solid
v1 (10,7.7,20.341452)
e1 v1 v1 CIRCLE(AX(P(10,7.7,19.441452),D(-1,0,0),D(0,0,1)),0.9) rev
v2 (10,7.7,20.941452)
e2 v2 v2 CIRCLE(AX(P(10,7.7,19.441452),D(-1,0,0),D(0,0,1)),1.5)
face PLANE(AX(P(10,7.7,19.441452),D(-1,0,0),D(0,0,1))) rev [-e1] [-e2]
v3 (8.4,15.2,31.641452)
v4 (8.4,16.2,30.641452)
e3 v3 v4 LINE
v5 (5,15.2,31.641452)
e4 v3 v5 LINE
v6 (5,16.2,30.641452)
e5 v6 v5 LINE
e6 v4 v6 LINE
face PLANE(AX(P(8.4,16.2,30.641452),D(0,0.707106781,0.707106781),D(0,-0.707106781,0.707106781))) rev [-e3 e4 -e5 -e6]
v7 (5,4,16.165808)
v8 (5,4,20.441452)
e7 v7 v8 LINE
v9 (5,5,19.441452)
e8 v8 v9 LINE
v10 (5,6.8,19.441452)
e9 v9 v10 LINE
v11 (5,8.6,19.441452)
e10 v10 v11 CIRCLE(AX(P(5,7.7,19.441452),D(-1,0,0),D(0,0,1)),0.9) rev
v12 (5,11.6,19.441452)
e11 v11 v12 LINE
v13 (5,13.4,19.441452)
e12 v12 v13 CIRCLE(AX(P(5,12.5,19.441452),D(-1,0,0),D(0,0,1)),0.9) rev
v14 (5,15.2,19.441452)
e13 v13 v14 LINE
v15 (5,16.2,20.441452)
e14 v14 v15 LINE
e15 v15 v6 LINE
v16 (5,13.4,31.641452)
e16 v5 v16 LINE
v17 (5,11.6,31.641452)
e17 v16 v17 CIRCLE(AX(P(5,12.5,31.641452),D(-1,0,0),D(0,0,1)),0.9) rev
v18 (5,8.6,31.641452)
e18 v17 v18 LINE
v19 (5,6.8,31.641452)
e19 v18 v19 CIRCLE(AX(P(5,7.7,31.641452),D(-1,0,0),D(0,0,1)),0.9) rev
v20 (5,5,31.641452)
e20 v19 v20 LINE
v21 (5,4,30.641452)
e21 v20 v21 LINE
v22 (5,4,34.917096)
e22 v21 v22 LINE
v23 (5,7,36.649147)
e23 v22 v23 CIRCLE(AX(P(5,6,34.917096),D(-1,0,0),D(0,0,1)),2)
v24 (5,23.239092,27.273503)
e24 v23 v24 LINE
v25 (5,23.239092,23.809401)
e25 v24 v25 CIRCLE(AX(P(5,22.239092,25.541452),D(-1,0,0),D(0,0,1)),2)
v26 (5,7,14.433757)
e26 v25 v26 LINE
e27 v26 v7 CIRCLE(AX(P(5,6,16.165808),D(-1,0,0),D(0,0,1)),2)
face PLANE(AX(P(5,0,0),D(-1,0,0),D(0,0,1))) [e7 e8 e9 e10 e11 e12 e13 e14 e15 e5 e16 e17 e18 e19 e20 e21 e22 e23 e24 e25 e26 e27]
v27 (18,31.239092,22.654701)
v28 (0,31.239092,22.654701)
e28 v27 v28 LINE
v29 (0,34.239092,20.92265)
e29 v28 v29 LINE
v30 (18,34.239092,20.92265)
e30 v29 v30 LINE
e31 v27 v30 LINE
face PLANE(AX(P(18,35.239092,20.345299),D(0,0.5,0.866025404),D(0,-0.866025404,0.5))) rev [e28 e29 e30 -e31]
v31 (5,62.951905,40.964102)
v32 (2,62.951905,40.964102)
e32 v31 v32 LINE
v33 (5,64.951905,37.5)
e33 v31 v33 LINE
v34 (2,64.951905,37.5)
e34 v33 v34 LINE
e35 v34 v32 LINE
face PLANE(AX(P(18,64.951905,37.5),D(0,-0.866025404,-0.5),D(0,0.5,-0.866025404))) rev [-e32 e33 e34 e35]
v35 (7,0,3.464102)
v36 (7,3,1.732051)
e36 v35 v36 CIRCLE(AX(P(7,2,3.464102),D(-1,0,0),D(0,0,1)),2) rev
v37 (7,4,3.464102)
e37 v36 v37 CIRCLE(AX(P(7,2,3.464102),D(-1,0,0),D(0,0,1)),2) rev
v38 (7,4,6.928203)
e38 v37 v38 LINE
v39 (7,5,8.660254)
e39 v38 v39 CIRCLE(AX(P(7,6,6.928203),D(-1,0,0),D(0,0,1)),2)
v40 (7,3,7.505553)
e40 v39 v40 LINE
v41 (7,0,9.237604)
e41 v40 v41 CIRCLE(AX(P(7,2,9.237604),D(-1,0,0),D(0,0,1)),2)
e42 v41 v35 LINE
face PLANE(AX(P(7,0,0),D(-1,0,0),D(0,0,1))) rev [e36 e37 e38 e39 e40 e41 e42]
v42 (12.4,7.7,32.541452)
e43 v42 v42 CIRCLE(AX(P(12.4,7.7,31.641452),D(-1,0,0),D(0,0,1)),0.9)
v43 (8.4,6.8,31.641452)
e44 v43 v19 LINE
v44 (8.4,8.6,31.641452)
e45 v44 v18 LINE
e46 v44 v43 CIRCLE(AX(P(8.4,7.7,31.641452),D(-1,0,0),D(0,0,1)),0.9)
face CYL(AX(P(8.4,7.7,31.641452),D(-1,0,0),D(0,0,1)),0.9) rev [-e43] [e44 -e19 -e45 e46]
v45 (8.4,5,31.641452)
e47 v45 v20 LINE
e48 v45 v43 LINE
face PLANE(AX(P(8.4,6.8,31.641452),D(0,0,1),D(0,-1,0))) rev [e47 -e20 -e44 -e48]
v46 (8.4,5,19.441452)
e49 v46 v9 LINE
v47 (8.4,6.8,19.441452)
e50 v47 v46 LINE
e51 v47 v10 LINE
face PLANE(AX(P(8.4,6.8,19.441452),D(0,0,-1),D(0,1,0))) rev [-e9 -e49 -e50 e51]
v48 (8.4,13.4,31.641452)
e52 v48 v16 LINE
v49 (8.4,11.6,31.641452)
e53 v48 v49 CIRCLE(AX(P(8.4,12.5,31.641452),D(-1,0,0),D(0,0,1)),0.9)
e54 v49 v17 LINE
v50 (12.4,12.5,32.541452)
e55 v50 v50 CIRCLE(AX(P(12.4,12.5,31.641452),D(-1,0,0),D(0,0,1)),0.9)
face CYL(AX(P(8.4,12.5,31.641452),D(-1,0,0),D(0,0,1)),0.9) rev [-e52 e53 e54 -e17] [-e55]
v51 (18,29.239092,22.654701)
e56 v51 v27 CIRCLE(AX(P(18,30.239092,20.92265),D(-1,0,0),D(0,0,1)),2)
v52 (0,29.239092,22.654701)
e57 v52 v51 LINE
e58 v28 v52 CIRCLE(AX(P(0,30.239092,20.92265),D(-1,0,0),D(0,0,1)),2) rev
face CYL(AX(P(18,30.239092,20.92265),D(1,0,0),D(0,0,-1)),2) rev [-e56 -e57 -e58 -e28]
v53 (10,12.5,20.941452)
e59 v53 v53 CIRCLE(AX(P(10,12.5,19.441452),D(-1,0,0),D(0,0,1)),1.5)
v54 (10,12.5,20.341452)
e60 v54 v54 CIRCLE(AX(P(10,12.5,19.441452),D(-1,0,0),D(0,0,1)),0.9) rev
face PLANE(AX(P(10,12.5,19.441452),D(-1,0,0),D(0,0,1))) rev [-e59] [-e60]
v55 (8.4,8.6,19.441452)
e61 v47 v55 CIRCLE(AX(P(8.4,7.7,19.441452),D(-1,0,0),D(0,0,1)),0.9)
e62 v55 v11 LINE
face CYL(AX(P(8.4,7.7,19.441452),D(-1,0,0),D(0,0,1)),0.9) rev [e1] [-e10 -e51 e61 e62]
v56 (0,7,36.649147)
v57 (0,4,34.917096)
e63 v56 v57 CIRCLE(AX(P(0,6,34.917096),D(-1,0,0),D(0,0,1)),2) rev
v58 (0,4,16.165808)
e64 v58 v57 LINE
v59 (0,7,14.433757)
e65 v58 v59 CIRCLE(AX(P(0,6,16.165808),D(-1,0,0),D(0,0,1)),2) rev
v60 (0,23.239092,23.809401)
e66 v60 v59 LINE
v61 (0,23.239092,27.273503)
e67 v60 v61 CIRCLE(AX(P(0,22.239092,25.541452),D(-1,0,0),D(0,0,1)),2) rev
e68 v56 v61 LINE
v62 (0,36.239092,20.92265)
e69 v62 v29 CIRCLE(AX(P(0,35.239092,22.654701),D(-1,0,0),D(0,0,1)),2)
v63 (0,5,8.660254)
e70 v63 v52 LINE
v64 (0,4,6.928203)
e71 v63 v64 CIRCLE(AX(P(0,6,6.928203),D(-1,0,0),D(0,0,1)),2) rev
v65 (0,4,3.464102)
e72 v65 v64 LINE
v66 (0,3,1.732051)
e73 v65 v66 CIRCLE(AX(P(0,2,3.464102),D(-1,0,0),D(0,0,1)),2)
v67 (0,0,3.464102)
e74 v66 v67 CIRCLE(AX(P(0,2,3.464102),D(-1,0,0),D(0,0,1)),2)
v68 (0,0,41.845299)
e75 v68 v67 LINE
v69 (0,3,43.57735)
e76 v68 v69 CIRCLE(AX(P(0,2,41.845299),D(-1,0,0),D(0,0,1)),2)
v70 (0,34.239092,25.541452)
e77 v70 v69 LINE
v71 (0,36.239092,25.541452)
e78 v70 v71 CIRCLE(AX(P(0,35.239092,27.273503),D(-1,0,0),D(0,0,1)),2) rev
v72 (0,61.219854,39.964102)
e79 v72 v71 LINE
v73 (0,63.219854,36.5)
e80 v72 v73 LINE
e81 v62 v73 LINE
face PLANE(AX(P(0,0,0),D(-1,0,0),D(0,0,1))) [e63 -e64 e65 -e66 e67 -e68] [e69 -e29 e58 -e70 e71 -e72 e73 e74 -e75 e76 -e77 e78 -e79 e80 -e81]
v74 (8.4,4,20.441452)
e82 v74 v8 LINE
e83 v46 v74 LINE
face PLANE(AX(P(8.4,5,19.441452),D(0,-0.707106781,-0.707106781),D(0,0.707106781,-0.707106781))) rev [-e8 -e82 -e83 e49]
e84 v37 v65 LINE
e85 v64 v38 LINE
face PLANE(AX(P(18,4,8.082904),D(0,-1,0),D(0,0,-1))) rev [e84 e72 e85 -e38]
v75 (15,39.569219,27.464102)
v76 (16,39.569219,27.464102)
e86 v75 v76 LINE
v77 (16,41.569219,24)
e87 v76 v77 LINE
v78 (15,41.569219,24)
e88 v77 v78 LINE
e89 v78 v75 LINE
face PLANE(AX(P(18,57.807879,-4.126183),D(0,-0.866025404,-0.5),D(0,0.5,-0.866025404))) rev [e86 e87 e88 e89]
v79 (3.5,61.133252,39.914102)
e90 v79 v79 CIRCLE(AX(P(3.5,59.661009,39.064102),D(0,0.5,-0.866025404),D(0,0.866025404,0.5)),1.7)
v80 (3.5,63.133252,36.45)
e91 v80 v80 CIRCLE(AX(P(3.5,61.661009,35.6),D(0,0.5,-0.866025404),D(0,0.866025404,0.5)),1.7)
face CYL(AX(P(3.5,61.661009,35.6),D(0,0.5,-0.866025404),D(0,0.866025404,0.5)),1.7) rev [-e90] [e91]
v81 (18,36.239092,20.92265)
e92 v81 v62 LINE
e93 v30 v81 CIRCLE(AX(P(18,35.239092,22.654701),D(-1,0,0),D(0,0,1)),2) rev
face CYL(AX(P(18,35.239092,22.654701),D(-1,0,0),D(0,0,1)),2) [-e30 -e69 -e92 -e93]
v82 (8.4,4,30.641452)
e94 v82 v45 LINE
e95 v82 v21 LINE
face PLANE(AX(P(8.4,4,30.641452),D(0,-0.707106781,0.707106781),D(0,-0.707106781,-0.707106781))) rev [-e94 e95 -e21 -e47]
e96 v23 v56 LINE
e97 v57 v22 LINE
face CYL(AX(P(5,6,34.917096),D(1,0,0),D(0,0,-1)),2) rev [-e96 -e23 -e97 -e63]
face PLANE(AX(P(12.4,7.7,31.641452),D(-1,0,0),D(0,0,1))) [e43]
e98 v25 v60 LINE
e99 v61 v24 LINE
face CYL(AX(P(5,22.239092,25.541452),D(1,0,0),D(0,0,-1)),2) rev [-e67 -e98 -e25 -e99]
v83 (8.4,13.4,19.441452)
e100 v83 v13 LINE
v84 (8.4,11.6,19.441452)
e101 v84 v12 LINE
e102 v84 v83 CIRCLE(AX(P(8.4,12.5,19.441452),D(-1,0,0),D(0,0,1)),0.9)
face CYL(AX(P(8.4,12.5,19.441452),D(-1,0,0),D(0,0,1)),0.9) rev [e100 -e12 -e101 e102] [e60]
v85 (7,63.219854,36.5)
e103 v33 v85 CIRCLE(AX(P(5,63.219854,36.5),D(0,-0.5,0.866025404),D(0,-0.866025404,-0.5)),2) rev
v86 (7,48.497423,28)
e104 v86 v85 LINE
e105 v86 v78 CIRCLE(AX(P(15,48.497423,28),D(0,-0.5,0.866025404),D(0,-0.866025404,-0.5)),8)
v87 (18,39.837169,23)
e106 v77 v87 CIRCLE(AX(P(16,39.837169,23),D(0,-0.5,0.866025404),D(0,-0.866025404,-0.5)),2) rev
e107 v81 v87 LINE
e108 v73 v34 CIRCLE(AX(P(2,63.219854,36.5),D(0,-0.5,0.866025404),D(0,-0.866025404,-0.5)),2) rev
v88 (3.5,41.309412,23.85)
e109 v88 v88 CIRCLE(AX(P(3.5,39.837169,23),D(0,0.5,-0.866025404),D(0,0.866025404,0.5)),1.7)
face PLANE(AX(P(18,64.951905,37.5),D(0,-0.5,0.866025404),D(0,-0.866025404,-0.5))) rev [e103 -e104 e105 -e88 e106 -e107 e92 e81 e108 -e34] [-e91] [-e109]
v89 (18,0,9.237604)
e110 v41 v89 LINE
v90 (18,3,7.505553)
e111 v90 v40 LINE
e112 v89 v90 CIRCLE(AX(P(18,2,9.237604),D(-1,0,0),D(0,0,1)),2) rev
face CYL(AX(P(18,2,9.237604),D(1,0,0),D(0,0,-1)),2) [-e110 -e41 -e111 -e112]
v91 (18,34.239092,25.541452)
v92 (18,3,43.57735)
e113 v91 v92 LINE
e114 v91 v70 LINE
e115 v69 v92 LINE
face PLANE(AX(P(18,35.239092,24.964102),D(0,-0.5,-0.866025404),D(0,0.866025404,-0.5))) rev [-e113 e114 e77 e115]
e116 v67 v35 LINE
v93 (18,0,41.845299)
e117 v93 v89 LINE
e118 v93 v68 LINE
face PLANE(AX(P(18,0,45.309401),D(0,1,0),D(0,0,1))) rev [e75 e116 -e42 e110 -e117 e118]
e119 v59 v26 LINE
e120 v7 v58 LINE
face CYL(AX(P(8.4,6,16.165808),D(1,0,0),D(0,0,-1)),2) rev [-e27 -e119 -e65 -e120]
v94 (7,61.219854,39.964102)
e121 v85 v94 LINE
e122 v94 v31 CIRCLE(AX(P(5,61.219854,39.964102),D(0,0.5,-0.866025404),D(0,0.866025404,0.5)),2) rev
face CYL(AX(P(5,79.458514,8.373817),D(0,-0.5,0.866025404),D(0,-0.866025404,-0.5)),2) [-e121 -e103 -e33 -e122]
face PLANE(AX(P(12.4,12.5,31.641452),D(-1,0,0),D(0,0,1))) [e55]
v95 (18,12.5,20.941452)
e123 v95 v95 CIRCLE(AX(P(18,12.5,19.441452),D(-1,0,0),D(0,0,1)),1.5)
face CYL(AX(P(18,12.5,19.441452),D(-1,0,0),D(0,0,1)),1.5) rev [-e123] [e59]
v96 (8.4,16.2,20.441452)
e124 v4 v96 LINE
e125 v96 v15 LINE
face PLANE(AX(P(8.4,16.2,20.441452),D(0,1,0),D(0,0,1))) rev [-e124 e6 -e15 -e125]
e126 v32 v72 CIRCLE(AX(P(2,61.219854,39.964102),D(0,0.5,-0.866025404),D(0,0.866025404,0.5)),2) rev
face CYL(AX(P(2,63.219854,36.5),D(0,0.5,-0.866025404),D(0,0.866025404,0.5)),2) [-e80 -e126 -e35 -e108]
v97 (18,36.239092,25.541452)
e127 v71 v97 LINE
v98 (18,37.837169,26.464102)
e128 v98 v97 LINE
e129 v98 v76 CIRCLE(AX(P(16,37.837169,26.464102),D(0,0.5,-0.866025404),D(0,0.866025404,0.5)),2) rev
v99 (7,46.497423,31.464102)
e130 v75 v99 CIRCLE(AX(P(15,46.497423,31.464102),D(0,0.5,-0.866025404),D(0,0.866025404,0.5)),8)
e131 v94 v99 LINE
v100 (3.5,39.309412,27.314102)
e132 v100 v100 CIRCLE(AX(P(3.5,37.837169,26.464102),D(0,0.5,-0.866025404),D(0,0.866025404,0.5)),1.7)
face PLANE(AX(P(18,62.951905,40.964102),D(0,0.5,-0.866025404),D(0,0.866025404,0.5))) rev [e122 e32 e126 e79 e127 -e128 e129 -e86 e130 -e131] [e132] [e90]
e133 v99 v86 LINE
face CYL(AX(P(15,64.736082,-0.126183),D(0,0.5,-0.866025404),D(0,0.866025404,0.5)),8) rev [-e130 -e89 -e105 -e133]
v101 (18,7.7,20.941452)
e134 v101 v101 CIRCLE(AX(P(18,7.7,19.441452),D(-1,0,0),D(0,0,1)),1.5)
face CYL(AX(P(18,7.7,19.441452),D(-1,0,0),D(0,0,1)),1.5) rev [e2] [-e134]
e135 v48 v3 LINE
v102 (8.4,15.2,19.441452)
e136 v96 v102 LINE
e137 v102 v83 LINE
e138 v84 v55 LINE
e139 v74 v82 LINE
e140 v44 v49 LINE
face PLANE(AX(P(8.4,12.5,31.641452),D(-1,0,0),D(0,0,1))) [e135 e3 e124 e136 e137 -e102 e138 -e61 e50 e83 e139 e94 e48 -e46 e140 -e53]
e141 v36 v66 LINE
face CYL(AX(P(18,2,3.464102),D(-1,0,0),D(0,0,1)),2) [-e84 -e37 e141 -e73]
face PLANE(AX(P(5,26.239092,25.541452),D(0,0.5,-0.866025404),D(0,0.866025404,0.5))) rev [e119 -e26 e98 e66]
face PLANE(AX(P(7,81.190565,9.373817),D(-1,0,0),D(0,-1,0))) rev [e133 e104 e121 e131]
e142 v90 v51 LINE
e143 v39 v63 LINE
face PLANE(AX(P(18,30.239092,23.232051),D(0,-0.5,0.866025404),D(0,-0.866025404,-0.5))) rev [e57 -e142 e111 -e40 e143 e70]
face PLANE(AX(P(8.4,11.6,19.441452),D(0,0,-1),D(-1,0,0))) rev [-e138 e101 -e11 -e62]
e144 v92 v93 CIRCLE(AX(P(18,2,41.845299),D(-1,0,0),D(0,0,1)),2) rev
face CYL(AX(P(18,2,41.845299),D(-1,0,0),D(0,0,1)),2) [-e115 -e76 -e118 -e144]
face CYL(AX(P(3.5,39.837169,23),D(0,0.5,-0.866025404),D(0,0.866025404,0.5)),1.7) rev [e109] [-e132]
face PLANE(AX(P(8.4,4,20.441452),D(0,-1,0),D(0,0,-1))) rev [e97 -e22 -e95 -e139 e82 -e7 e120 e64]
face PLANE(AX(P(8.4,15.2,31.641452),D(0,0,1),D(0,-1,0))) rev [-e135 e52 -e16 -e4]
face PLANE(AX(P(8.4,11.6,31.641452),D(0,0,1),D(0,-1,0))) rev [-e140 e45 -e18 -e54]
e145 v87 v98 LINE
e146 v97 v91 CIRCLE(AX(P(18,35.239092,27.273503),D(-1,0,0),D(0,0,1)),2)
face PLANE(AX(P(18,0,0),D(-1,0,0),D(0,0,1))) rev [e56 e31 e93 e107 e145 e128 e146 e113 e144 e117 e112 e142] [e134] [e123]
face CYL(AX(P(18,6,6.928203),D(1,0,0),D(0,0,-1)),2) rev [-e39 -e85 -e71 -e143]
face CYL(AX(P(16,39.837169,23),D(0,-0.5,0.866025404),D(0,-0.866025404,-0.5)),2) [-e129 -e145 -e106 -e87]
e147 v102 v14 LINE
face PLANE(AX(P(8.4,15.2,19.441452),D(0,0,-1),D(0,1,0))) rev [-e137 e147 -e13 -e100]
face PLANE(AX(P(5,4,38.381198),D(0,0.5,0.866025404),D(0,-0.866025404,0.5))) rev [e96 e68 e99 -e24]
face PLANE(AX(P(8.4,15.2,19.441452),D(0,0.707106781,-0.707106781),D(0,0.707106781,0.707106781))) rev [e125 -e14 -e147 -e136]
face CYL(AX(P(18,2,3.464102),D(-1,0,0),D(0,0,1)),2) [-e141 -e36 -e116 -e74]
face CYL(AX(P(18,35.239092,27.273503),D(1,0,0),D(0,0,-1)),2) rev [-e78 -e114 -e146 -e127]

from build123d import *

# Parameters (mm, degrees)
BOSS_EXTRU_1_DEPTH      = 18
ENL_V_MAT_EXTRU_1_REACH = 82.979
ESQUISSE4_W             = 11
ESQUISSE4_H             = 27
ENL_V_MAT_EXTRU_2_DEPTH = 11
D_GAGEMENT_M31_D        = 3.4
ENL_V_MAT_EXTRU_3_DEPTH = 8.4
ESQUISSE10_R            = 0.9
ENL_V_MAT_EXTRU_4_DEPTH = 4
ENL_V_MAT_EXTRU_5_DEPTH = 5
CONG_1_R                = 2
CONG_2_R                = 8
ENL_V_START             = -1.6
ESQUISSE13_R            = 1.5
ENL_V_MAT_EXTRU_6_DEPTH = 78.3514199


with BuildPart() as part:
    # Esquisse1 → Boss.-Extru.1 (new body)
    with BuildSketch(Plane(origin=(0, 0, 0), x_dir=(0, 0, -1), z_dir=(1, 0, 0))):
        Polygon((-37.5, 64.951905284), (-40.964101615, 62.951905284), (-24.964101615, 35.239092363), (-45.309401077, 0), (0, 0), (-2.309401077, 4), (-8.082903769, 4), (-23.232050808, 30.239092363), (-20.345299462, 35.239092363), align=None)
    extrude(amount=BOSS_EXTRU_1_DEPTH)

    # Esquisse4 → Enlèv. mat.-Extru.1 (cut, up to next)
    with BuildSketch(Plane(origin=(0, -2, 3.464101615), x_dir=(1, 0, 0), z_dir=(0, -0.5000000000000047, 0.8660254037844359)), mode=Mode.PRIVATE) as enl_v_mat_extru_1_sk1:
        with Locations((12.5, 61.5)):
            Rectangle(ESQUISSE4_W, ESQUISSE4_H)
    enl_v_mat_extru_1_tool1 = extrude(enl_v_mat_extru_1_sk1.sketch, amount=-ENL_V_MAT_EXTRU_1_REACH, mode=Mode.PRIVATE) & part.part
    add(enl_v_mat_extru_1_tool1.solids().sort_by_distance((12.5, 51.260562, 34.214102))[0], mode=Mode.SUBTRACT)

    # Esquisse6 → Enlèv. mat.-Extru.2 (cut)
    with BuildSketch(Plane(origin=(18, 0, 0), x_dir=(0, 0, -1), z_dir=(1, 0, 0))):
        Polygon((0, 0), (-2.309401077, 4), (-8.082903769, 4), (-5.773502692, 0), align=None)
    extrude(amount=-ENL_V_MAT_EXTRU_2_DEPTH, mode=Mode.SUBTRACT)

    # Dégagement M31 (through all)
    with Locations(Plane(origin=(0, 0, 0), x_dir=(-1, 0, 0), z_dir=(0, 0.5000000000000047, -0.866025403784436))):
        with Locations((-3.5, 71.2), (-3.5, 46)):
            Hole(D_GAGEMENT_M31_D / 2)

    # Esquisse9 → Enlèv. mat.-Extru.3 (cut)
    with BuildSketch(Plane.ZY):
        with BuildLine():
            Line((19.441451884, 15.2), (20.441451884, 16.2))
            Line((20.441451884, 16.2), (30.641451884, 16.2))
            Line((30.641451884, 16.2), (31.641451884, 15.2))
            Line((31.641451884, 15.2), (31.641451884, 13.4))
            ThreePointArc((31.641451884, 13.4), (32.541451884, 12.5), (31.641451884, 11.6))
            Line((31.641451884, 11.6), (31.641451884, 8.6))
            ThreePointArc((31.641451884, 8.6), (32.541451884, 7.7), (31.641451884, 6.8))
            Line((31.641451884, 6.8), (31.641451884, 5))
            Line((31.641451884, 5), (30.641451884, 4))
            Line((30.641451884, 4), (20.441451884, 4))
            Line((20.441451884, 4), (19.441451884, 5))
            Line((19.441451884, 5), (19.441451884, 6.8))
            ThreePointArc((19.441451884, 6.8), (18.541451884, 7.7), (19.441451884, 8.6))
            Line((19.441451884, 8.6), (19.441451884, 11.6))
            ThreePointArc((19.441451884, 11.6), (18.541451884, 12.5), (19.441451884, 13.4))
            Line((19.441451884, 13.4), (19.441451884, 15.2))
        make_face()
    extrude(amount=-ENL_V_MAT_EXTRU_3_DEPTH, mode=Mode.SUBTRACT)

    # Esquisse10 → Enlèv. mat.-Extru.4 (cut)
    with BuildSketch(Plane.ZY.offset(-8.4)):
        with Locations((19.441451884, 12.5)):
            Circle(ESQUISSE10_R)
        with Locations((19.441451884, 7.7)):
            Circle(ESQUISSE10_R)
        with Locations((31.641451884, 12.5)):
            Circle(ESQUISSE10_R)
        with Locations((31.641451884, 7.7)):
            Circle(ESQUISSE10_R)
    extrude(amount=-ENL_V_MAT_EXTRU_4_DEPTH, mode=Mode.SUBTRACT)

    # Esquisse11 → Enlèv. mat.-Extru.5 (cut)
    with BuildSketch(Plane.ZY):
        Polygon((25.541451884, 26.239092363), (12.701705922, 4), (38.381197846, 4), align=None)
    extrude(amount=-ENL_V_MAT_EXTRU_5_DEPTH, mode=Mode.SUBTRACT)

    # Congé1
    cong_1_edges = [part.edges().sort_by_distance(p)[0] for p in [
        (0, 63.951905284, 39.232050808),
        (2.5, 4, 38.381197846),
        (2.5, 26.239092363, 25.541451884),
        (2.5, 4, 12.701705922),
        (9, 0, 45.309401077),
        (9, 35.239092363, 24.964101615),
        (9, 35.239092363, 20.345299462),
        (9, 30.239092363, 23.232050808),
        (18, 40.569219382, 25.732050808),
        (7, 63.951905284, 39.232050808),
        (3.5, 0, 0),
        (3.5, 4, 8.082903769),
        (3.5, 4, 2.309401077),
        (12.5, 0, 5.773502692),
    ]]
    fillet(cong_1_edges, radius=CONG_1_R - 0.0001)  # a hair under: the kernel refuses the full size

    # Congé2
    cong_2_edges = [part.edges().sort_by_distance(p)[0] for p in [
        (7, 40.569219382, 25.732050808),
    ]]
    fillet(cong_2_edges, radius=CONG_2_R)

    # Esquisse13 → Enlèv. mat.-Extru.6 (cut, through all)
    with BuildSketch(Plane.ZY.offset(-8.4).offset(ENL_V_START)):
        with Locations((19.441451884, 12.5)):
            Circle(ESQUISSE13_R)
        with Locations((19.441451884, 7.7)):
            Circle(ESQUISSE13_R)
    extrude(amount=-ENL_V_MAT_EXTRU_6_DEPTH, mode=Mode.SUBTRACT)


solid = part.part
